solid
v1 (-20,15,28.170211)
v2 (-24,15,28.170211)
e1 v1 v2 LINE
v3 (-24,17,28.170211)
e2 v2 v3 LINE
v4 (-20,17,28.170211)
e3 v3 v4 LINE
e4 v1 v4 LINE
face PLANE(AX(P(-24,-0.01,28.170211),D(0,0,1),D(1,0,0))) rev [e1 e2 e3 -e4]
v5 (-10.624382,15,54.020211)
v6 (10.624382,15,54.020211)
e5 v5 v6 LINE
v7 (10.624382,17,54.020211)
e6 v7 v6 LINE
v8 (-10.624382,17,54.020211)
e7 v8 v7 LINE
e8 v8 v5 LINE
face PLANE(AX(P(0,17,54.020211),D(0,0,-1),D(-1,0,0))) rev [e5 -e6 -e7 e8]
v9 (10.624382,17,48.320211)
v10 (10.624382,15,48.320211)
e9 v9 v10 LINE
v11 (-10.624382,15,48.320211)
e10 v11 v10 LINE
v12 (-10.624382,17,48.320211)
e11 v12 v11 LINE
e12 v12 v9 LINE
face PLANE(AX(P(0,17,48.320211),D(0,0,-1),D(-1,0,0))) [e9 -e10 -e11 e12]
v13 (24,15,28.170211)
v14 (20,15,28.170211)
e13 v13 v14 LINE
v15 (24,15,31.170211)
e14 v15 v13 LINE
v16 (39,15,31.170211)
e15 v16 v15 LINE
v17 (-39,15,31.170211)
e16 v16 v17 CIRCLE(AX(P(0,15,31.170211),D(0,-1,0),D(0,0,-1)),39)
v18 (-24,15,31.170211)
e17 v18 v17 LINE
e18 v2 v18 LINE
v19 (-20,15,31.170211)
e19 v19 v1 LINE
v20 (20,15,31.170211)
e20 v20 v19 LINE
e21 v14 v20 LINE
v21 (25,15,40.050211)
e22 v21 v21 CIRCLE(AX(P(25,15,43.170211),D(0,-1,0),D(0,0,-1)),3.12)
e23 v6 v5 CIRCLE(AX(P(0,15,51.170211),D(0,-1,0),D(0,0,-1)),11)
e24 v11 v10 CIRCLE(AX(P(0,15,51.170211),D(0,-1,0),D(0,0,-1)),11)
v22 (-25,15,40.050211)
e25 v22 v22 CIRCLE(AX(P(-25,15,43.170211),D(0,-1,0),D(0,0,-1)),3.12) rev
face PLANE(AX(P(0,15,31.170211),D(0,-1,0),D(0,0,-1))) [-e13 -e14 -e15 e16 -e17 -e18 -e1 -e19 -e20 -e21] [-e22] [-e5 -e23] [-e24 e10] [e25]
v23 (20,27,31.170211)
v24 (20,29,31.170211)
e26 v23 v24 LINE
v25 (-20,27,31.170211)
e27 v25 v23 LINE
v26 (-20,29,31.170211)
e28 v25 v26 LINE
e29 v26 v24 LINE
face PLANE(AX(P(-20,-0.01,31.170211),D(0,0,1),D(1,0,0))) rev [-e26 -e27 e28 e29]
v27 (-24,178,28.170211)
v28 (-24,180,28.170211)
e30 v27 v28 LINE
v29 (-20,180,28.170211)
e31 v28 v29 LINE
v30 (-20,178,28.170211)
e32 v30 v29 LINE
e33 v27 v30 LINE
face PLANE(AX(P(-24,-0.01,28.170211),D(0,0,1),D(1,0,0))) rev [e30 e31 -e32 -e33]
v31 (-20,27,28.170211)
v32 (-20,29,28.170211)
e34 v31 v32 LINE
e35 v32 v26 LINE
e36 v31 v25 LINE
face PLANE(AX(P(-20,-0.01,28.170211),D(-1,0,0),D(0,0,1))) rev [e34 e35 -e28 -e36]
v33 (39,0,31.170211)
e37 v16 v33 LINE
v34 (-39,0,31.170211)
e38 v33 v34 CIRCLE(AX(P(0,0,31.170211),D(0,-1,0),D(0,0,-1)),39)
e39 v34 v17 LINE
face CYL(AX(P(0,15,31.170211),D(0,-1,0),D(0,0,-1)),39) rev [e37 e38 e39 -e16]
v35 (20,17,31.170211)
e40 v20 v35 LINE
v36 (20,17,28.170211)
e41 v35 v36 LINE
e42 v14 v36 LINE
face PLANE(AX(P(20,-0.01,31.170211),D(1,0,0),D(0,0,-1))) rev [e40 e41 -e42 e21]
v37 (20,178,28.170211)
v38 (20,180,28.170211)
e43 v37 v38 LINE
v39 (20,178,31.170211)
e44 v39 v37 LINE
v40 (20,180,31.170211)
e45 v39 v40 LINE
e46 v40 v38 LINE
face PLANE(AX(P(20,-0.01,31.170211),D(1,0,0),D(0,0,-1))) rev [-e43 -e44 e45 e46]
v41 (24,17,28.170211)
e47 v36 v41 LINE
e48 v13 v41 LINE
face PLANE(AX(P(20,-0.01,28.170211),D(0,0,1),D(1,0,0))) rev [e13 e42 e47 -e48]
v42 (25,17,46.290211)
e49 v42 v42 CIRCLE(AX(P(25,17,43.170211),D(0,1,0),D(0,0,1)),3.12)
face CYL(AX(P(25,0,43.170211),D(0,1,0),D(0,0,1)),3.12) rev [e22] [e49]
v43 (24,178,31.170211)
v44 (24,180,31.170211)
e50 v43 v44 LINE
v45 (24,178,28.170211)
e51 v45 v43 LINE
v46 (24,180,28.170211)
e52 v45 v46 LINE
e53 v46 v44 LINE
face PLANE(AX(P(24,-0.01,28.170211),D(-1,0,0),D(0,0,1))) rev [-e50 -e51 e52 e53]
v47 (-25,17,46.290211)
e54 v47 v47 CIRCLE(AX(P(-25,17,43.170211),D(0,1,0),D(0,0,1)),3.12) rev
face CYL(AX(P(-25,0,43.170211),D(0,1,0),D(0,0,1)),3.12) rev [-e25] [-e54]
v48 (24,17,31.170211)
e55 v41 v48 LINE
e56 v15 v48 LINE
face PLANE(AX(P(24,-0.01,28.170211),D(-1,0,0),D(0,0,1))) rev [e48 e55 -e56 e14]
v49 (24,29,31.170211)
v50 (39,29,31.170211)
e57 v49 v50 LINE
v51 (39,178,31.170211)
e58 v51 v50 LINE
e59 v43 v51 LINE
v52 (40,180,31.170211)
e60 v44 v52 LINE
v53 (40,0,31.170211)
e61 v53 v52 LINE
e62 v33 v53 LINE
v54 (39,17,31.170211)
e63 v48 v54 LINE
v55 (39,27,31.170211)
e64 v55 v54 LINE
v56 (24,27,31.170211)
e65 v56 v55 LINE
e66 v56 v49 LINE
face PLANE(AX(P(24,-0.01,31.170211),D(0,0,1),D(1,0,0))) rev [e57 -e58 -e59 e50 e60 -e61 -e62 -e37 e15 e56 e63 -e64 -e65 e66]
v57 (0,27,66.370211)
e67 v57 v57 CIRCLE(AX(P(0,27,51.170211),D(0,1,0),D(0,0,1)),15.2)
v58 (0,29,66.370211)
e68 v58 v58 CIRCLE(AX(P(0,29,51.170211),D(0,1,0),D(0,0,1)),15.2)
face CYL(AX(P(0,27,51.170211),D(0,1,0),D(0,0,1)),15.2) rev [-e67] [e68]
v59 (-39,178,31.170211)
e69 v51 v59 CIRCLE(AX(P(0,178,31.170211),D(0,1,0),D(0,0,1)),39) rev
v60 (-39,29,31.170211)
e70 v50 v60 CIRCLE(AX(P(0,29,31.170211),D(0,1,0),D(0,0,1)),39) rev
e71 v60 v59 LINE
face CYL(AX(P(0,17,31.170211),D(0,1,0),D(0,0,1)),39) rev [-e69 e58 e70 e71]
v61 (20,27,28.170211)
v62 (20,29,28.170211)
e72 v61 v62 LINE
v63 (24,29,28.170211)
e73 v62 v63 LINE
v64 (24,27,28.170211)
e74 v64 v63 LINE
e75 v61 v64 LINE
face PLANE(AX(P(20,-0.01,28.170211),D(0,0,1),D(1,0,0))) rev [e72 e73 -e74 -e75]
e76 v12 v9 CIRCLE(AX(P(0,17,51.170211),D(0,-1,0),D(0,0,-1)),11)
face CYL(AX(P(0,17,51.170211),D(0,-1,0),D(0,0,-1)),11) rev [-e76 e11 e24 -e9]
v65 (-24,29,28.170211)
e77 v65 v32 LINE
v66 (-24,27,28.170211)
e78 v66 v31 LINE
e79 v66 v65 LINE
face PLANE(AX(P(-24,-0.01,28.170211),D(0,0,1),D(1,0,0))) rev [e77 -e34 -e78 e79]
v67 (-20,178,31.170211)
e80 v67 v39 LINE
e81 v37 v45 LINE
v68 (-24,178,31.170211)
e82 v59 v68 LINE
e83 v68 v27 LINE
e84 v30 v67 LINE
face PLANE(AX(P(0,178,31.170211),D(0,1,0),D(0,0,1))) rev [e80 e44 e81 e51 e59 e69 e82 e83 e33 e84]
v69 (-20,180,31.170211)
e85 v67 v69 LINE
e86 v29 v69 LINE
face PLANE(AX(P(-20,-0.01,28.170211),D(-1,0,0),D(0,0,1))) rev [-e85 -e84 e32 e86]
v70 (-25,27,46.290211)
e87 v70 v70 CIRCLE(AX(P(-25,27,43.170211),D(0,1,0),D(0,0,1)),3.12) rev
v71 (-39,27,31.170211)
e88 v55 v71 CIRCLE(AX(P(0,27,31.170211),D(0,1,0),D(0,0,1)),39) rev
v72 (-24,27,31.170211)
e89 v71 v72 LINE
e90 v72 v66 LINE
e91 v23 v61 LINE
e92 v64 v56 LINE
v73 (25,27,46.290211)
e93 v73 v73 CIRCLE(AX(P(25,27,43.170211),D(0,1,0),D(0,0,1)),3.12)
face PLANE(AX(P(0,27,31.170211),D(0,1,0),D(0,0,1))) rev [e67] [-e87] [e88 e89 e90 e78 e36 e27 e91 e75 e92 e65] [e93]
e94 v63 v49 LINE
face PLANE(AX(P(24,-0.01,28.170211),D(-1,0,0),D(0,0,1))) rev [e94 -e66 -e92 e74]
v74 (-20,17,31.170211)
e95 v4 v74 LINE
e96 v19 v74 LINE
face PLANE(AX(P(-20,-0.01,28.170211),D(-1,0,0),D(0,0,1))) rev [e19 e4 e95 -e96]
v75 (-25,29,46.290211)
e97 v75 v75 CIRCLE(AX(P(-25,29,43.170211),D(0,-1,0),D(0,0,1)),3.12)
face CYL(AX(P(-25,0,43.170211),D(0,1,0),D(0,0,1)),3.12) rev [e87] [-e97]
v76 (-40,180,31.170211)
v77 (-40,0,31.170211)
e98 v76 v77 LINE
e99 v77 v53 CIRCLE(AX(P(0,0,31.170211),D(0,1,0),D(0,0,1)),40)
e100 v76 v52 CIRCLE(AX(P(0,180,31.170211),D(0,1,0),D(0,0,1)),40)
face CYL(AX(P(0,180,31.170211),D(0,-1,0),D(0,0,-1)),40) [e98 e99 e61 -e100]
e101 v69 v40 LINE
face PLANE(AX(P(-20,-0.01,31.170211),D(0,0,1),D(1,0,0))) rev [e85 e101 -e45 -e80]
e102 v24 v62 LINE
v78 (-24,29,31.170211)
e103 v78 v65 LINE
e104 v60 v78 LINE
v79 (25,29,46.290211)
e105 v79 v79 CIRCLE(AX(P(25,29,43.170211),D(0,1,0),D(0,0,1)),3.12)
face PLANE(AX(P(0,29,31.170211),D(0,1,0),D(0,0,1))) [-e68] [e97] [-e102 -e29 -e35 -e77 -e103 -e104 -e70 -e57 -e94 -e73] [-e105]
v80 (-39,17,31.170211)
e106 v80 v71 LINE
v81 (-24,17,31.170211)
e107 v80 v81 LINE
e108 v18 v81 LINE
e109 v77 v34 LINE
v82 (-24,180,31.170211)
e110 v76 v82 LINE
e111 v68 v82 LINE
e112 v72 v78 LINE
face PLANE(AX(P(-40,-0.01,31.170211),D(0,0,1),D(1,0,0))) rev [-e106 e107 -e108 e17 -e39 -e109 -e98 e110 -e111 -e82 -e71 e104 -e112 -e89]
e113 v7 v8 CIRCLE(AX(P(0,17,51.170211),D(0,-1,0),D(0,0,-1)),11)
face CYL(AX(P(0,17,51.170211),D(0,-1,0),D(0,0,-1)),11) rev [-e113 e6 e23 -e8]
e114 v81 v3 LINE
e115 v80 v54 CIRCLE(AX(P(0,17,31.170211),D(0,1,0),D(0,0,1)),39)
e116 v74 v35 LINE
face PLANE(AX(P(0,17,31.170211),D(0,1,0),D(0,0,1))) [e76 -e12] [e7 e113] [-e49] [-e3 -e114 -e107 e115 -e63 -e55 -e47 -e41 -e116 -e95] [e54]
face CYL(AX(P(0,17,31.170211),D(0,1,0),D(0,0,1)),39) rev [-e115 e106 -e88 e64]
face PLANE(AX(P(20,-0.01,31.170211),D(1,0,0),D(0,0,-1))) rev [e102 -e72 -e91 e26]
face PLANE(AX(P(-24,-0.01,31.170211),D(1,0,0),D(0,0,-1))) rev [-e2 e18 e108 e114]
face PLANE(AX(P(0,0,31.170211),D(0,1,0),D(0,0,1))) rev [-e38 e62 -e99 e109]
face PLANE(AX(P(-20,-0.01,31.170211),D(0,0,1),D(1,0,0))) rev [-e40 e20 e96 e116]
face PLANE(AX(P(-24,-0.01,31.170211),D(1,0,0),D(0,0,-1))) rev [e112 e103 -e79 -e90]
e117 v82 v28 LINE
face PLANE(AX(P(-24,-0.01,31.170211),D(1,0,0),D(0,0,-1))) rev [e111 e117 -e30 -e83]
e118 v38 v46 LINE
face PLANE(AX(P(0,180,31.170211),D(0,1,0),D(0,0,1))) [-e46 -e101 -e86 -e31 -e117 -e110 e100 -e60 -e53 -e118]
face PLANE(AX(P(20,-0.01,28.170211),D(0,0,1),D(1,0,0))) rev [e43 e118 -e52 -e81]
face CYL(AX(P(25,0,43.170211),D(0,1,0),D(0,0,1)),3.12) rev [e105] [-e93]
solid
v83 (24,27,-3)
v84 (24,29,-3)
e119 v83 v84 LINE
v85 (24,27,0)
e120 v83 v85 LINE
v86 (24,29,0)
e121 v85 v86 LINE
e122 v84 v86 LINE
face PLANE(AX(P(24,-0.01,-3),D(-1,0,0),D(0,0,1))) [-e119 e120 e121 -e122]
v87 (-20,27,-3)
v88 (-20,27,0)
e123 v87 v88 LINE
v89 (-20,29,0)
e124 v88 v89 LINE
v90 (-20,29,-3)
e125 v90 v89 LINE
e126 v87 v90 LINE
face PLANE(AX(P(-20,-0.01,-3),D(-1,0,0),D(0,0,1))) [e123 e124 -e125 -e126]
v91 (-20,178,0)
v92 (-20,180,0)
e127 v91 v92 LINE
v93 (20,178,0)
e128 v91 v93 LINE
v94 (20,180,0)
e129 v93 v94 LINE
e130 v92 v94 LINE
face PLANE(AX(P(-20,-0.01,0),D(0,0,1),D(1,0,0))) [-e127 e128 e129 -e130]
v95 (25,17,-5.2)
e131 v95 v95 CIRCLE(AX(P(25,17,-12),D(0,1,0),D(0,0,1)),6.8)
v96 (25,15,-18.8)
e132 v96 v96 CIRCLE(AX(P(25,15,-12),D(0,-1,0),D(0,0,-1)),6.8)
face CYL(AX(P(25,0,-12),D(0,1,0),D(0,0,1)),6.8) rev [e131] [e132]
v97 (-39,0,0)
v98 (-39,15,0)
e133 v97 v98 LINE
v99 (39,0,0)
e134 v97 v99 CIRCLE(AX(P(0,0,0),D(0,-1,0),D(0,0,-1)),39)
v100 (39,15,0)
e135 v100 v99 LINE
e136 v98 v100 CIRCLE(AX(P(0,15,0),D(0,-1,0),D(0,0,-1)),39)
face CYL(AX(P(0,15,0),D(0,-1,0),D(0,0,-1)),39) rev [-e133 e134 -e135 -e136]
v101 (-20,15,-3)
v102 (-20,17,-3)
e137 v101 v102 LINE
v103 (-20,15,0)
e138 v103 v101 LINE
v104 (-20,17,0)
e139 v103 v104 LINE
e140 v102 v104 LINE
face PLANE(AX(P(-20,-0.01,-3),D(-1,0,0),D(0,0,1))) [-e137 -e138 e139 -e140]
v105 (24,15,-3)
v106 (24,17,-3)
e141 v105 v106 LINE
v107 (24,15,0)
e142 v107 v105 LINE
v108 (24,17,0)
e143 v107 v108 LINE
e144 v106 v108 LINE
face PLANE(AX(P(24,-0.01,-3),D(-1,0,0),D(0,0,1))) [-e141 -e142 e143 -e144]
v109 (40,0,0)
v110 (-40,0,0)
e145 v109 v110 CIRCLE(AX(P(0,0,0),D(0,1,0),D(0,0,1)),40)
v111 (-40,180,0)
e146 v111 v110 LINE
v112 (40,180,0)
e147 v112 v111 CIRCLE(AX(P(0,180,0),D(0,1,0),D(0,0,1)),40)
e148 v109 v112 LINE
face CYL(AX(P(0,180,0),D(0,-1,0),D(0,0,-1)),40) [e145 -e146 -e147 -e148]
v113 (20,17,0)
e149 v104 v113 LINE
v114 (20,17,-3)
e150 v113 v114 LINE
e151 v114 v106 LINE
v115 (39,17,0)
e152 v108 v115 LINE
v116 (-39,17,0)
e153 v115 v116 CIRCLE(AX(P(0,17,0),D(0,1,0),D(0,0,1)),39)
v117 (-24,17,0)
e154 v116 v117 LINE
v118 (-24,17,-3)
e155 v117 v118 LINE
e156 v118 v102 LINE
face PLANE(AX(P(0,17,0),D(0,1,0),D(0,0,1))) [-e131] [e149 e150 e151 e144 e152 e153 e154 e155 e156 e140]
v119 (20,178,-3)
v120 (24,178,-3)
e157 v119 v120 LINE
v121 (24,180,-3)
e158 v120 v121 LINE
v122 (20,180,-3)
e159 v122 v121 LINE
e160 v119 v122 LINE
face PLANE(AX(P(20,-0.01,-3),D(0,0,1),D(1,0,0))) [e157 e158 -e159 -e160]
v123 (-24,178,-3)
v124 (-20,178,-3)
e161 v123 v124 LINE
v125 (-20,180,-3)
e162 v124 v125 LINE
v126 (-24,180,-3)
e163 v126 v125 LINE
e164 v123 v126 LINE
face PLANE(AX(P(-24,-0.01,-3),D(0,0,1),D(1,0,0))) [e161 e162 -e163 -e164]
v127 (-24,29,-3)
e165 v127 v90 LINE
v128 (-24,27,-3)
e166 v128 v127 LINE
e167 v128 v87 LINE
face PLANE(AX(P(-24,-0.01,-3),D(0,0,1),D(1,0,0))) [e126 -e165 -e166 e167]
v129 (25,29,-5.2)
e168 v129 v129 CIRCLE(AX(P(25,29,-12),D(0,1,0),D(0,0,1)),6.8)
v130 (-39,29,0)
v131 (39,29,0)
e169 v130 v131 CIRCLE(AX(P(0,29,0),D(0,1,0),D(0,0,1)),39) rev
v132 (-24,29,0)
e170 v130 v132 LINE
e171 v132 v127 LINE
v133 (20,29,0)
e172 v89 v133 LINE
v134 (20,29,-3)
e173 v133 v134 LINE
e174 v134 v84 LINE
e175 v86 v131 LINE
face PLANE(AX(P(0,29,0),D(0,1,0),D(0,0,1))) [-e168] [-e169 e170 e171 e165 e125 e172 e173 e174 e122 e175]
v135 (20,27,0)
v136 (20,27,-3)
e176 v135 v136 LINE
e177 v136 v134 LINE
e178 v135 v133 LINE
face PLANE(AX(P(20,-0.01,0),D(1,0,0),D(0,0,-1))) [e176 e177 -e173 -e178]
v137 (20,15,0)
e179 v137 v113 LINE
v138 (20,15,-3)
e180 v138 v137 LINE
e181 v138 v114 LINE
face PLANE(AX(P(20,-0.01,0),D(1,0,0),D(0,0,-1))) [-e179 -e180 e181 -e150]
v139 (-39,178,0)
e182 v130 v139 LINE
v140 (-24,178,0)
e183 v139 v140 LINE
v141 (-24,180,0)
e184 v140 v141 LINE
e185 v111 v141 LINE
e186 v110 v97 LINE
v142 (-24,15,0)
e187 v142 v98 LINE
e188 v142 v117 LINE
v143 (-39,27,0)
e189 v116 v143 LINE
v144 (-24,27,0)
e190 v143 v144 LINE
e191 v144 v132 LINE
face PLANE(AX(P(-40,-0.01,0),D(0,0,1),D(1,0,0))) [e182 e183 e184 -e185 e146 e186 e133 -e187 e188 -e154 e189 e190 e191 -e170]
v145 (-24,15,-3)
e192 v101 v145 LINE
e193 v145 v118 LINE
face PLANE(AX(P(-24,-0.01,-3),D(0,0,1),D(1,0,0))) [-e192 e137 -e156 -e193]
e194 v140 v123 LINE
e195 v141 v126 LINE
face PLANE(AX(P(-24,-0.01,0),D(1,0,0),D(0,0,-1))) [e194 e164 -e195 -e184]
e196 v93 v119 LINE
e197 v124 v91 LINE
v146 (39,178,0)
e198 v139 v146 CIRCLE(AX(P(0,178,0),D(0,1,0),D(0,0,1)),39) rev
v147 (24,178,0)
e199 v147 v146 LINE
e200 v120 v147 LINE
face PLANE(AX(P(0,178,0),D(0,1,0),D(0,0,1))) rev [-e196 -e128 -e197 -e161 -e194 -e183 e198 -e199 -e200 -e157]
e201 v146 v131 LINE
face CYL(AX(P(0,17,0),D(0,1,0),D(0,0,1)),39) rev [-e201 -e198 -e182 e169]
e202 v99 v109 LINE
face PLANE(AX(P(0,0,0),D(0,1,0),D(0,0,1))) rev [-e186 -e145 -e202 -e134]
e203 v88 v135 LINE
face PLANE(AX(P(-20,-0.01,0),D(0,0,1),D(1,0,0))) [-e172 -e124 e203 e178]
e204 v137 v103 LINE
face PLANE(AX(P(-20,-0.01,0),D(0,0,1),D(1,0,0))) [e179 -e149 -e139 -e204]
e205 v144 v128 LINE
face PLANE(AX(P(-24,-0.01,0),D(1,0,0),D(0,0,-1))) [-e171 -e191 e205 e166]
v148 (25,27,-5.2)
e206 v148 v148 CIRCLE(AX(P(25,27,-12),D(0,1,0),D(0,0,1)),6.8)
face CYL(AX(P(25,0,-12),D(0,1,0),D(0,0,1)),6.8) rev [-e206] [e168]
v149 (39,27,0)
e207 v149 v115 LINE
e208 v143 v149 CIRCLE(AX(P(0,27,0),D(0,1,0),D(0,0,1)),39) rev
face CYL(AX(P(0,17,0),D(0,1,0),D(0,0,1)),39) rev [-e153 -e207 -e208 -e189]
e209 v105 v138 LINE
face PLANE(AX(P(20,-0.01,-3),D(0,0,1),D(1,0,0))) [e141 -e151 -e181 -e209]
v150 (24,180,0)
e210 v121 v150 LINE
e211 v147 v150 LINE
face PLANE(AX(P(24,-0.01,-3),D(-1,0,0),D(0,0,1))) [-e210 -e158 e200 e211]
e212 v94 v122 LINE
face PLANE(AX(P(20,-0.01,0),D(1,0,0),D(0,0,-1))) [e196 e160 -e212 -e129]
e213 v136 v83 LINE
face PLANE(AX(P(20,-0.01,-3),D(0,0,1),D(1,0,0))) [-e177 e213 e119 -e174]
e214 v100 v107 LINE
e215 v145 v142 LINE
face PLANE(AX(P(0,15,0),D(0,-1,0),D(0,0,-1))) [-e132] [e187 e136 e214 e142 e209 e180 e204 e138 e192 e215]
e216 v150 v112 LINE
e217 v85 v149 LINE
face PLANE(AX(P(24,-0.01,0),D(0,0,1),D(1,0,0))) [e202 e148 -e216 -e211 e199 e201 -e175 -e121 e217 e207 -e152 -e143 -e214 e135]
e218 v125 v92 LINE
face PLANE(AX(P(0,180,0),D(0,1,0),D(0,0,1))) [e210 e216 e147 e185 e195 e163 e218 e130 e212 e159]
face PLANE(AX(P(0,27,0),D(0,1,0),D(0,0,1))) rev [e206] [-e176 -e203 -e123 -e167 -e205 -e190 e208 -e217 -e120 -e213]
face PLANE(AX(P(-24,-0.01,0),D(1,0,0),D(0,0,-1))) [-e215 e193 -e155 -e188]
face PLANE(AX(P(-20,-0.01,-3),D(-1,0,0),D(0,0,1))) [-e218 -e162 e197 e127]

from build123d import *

# Parameters (mm, degrees)
SKETCH1_R               = 40
BOSS_EXTRUDE1_DEPTH     = 180
SKETCH3_R               = 39
CUT_EXTRUDE1_DEPTH      = 163
CUT_EXTRUDE2_START      = -15
SKETCH5_R               = 39
CUT_EXTRUDE2_DEPTH      = 15
SKETCH6_R               = 40
BOSS_EXTRUDE2_DEPTH     = 2
BOSS_EXTRUDE3_START     = -2
SKETCH7_R               = 40
BOSS_EXTRUDE3_DEPTH     = 2
SPLIT1_SURFACE_1_BACK   = 213.603
SPLIT1_SURFACE_1_DEPTH  = 427.206
SPLIT1_SURFACE_2_BACK   = 213.603
SPLIT1_SURFACE_2_DEPTH  = 427.206
BODY_MOVE_COPY1_DEPTH   = 180
BODY_MOVE_COPY1_START   = 29
BODY_MOVE_COPY1_2_DEPTH = 149
BODY_MOVE_COPY1_3_DEPTH = 15
BODY_MOVE_COPY1_START_2 = 17
BODY_MOVE_COPY1_4_DEPTH = 10
BODY_MOVE_COPY1_5_DEPTH = 180
BODY_MOVE_COPY1_START_3 = 15
BODY_MOVE_COPY1_6_DEPTH = 2
BODY_MOVE_COPY1_START_4 = 27
BODY_MOVE_COPY1_7_DEPTH = 2
BODY_MOVE_COPY1_START_5 = 178
BODY_MOVE_COPY1_8_DEPTH = 2
SKETCH9_R               = 15.2
CUT_EXTRUDE3_DEPTH      = 2
CUT_EXTRUDE4_DEPTH      = 2
SKETCH11_R              = 3.12
CUT_EXTRUDE5_DEPTH      = 172.657213337
SKETCH14_R              = 6.8
CUT_EXTRUDE6_DEPTH      = 172.657213337


# Read off the part's stored shape, not the designer's step: Body-Move/Copy1
with BuildPart() as part:
    # Sketch1 → Boss-Extrude1 (new body)
    with BuildSketch(Plane(origin=(0, 0, 0), x_dir=(1, 0, 0), z_dir=(0, 1, 0))):
        with Locations(Location((0, 0, 0), (0, 0, 90))):
            Circle(SKETCH1_R)
    extrude(amount=BOSS_EXTRUDE1_DEPTH)

    # Sketch3 → Cut-Extrude1 (cut)
    with BuildSketch(Plane(origin=(0, 180, 0), x_dir=(1, 0, 0), z_dir=(0, 1, 0))):
        with Locations(Location((0, 0, 0), (0, 0, 270))):
            Circle(SKETCH3_R)
    extrude(amount=-CUT_EXTRUDE1_DEPTH, mode=Mode.SUBTRACT)

    # Sketch5 → Cut-Extrude2 (cut)
    with BuildSketch(Plane.XZ.offset(CUT_EXTRUDE2_START)):
        with Locations(Location((0, 0, 0), (0, 0, 90))):
            Circle(SKETCH5_R)
    extrude(amount=CUT_EXTRUDE2_DEPTH, mode=Mode.SUBTRACT)

    # Sketch6 → Boss-Extrude2 (add)
    with BuildSketch(Plane(origin=(0, 27, 0), x_dir=(1, 0, 0), z_dir=(0, 1, 0))):
        with Locations(Location((0, 0, 0), (0, 0, 90))):
            Circle(SKETCH6_R)
    extrude(amount=BOSS_EXTRUDE2_DEPTH)

    # Sketch7 → Boss-Extrude3 (add)
    with BuildSketch(Plane(origin=(0, 180, 0), x_dir=(1, 0, 0), z_dir=(0, 1, 0)).offset(BOSS_EXTRUDE3_START)):
        with Locations(Location((0, 0, 0), (0, 0, 90))):
            Circle(SKETCH7_R)
    extrude(amount=BOSS_EXTRUDE3_DEPTH)


with BuildPart() as body_2:
    # Split1: the piece behind the surface
    add(part.part)
    # Split1 surface: a surface, the sketch's curves swept straight by 427.206 mm
    with BuildLine(Plane(origin=(0, 180, 0), x_dir=(1, 0, 0), z_dir=(0, 1, 0)).offset(-SPLIT1_SURFACE_1_BACK), mode=Mode.PRIVATE) as split1_surface_1_path:
        Line((-40, 0), (-24, 0))
        Line((-24, 0), (-24, 3))
        Line((-24, 3), (-20, 3))
        Line((-20, 3), (-20, 0))
        Line((-20, 0), (20, 0))
        Line((20, 0), (20, 3))
        Line((20, 3), (24, 3))
        Line((24, 3), (24, 0))
        Line((24, 0), (40, 0))
    split1_surface_1 = Shell.extrude(split1_surface_1_path.wire(), (0 * SPLIT1_SURFACE_1_DEPTH, 1 * SPLIT1_SURFACE_1_DEPTH, 0 * SPLIT1_SURFACE_1_DEPTH))
    split(bisect_by=split1_surface_1, keep=Keep.BOTTOM)

    # Body-Move/Copy1 outline → Body-Move/Copy1 (cut)
    with BuildSketch(Plane(origin=(0, 0, 0), x_dir=(1, 0, 0), z_dir=(0, 1, 0))):
        with BuildLine():
            Line((20, -28.170210697), (24, -28.170210697))
            Line((24, -28.170210697), (24, -31.170210697))
            Line((24, -31.170210697), (25.068266097, -31.170210697))
            ThreePointArc((25.068266097, -31.170210697), (36.074441395, -17.281049681), (40, 0))
            Line((40, 0), (24, 0))
            Line((24, 0), (24, 3))
            Line((24, 3), (20, 3))
            Line((20, 3), (20, 0))
            Line((20, 0), (-20, 0))
            Line((-20, 0), (-20, 3))
            Line((-20, 3), (-24, 3))
            Line((-24, 3), (-24, 0))
            Line((-24, 0), (-40, 0))
            ThreePointArc((-40, 0), (-36.074441395, -17.281049681), (-25.068266097, -31.170210697))
            Line((-25.068266097, -31.170210697), (-24, -31.170210697))
            Line((-24, -31.170210697), (-24, -28.170210697))
            Line((-24, -28.170210697), (-20, -28.170210697))
            Line((-20, -28.170210697), (-20, -31.170210697))
            Line((-20, -31.170210697), (20, -31.170210697))
            Line((20, -31.170210697), (20, -28.170210697))
        make_face()
    extrude(amount=BODY_MOVE_COPY1_DEPTH, mode=Mode.SUBTRACT)

    # Body-Move_Copy1 2 outline → Body-Move_Copy1 2 (cut)
    with BuildSketch(Plane(origin=(0, 0, 0), x_dir=(1, 0, 0), z_dir=(0, 1, 0)).offset(BODY_MOVE_COPY1_START)):
        with BuildLine():
            Line((24, -31.170210697), (24, -30.740852298))
            ThreePointArc((24, -30.740852298), (0, -39), (-24, -30.740852298))
            Line((-24, -30.740852298), (-24, -31.170210697))
            Line((-24, -31.170210697), (-25.068266097, -31.170210697))
            ThreePointArc((-25.068266097, -31.170210697), (0, -40), (25.068266097, -31.170210697))
            Line((25.068266097, -31.170210697), (24, -31.170210697))
        make_face()
    extrude(amount=BODY_MOVE_COPY1_2_DEPTH, mode=Mode.SUBTRACT)

    # Body-Move_Copy1 3 outline → Body-Move_Copy1 3 (cut)
    with BuildSketch(Plane(origin=(0, 0, 0), x_dir=(1, 0, 0), z_dir=(0, 1, 0))):
        with BuildLine():
            Line((24, -31.170210697), (24, -30.740852298))
            ThreePointArc((24, -30.740852298), (0, -39), (-24, -30.740852298))
            Line((-24, -30.740852298), (-24, -31.170210697))
            Line((-24, -31.170210697), (-25.068266097, -31.170210697))
            ThreePointArc((-25.068266097, -31.170210697), (0, -40), (25.068266097, -31.170210697))
            Line((25.068266097, -31.170210697), (24, -31.170210697))
        make_face()
    extrude(amount=BODY_MOVE_COPY1_3_DEPTH, mode=Mode.SUBTRACT)

    # Body-Move_Copy1 4 outline → Body-Move_Copy1 4 (cut)
    with BuildSketch(Plane(origin=(0, 0, 0), x_dir=(1, 0, 0), z_dir=(0, 1, 0)).offset(BODY_MOVE_COPY1_START_2)):
        with BuildLine():
            Line((24, -31.170210697), (24, -30.740852298))
            ThreePointArc((24, -30.740852298), (0, -39), (-24, -30.740852298))
            Line((-24, -30.740852298), (-24, -31.170210697))
            Line((-24, -31.170210697), (-25.068266097, -31.170210697))
            ThreePointArc((-25.068266097, -31.170210697), (0, -40), (25.068266097, -31.170210697))
            Line((25.068266097, -31.170210697), (24, -31.170210697))
        make_face()
    extrude(amount=BODY_MOVE_COPY1_4_DEPTH, mode=Mode.SUBTRACT)



with BuildPart() as part_1:
    add(part.part)

    # Split1: split by a surface, the side it looks to stays
    # Split1 surface: a surface, the sketch's curves swept straight by 427.206 mm
    with BuildLine(Plane(origin=(0, 180, 0), x_dir=(1, 0, 0), z_dir=(0, 1, 0)).offset(-SPLIT1_SURFACE_2_BACK), mode=Mode.PRIVATE) as split1_surface_2_path:
        Line((-40, 0), (-24, 0))
        Line((-24, 0), (-24, 3))
        Line((-24, 3), (-20, 3))
        Line((-20, 3), (-20, 0))
        Line((-20, 0), (20, 0))
        Line((20, 0), (20, 3))
        Line((20, 3), (24, 3))
        Line((24, 3), (24, 0))
        Line((24, 0), (40, 0))
    split1_surface_2 = Shell.extrude(split1_surface_2_path.wire(), (0 * SPLIT1_SURFACE_2_DEPTH, 1 * SPLIT1_SURFACE_2_DEPTH, 0 * SPLIT1_SURFACE_2_DEPTH))
    split(bisect_by=split1_surface_2, keep=Keep.TOP)

    # Sketch14 → Cut-Extrude6 (cut, through all)
    with BuildSketch(Plane(origin=(0, 29, 0), x_dir=(1, 0, 0), z_dir=(0, 1, 0))):
        with Locations(Location((25, 12, 0), (0, 0, 270))):
            Circle(SKETCH14_R)
    extrude(amount=-CUT_EXTRUDE6_DEPTH, mode=Mode.SUBTRACT)


with BuildPart() as body_3:
    # Body-Move_Copy1 5 outline → Body-Move_Copy1 5 (new body)
    with BuildSketch(Plane(origin=(0, 0, 0), x_dir=(1, 0, 0), z_dir=(0, 1, 0))):
        with BuildLine():
            Line((40, -31.170210697), (39, -31.170210697))
            ThreePointArc((39, -31.170210697), (0, -70.170210697), (-39, -31.170210697))
            Line((-39, -31.170210697), (-40, -31.170210697))
            ThreePointArc((-40, -31.170210697), (0, -71.170210697), (40, -31.170210697))
        make_face()
    extrude(amount=BODY_MOVE_COPY1_5_DEPTH)


with BuildPart() as body_2_1:
    add(body_2.part)

    add(body_3.part)  # Body-Move_Copy1 6 merges body 3
    # Body-Move_Copy1 6 outline → Body-Move_Copy1 6 (add)
    with BuildSketch(Plane(origin=(0, 0, 0), x_dir=(1, 0, 0), z_dir=(0, 1, 0)).offset(BODY_MOVE_COPY1_START_3)):
        with BuildLine():
            Line((39, -31.170210697), (25.068266097, -31.170210697))
            ThreePointArc((25.068266097, -31.170210697), (0, -40), (-25.068266097, -31.170210697))
            Line((-25.068266097, -31.170210697), (-39, -31.170210697))
            ThreePointArc((-39, -31.170210697), (0, -70.170210697), (39, -31.170210697))
        make_face()
    extrude(amount=BODY_MOVE_COPY1_6_DEPTH)

    # Body-Move_Copy1 7 outline → Body-Move_Copy1 7 (add)
    with BuildSketch(Plane(origin=(0, 0, 0), x_dir=(1, 0, 0), z_dir=(0, 1, 0)).offset(BODY_MOVE_COPY1_START_4)):
        with BuildLine():
            Line((39, -31.170210697), (25.068266097, -31.170210697))
            ThreePointArc((25.068266097, -31.170210697), (0, -40), (-25.068266097, -31.170210697))
            Line((-25.068266097, -31.170210697), (-39, -31.170210697))
            ThreePointArc((-39, -31.170210697), (0, -70.170210697), (39, -31.170210697))
        make_face()
    extrude(amount=BODY_MOVE_COPY1_7_DEPTH)

    # Body-Move_Copy1 8 outline → Body-Move_Copy1 8 (add)
    with BuildSketch(Plane(origin=(0, 0, 0), x_dir=(1, 0, 0), z_dir=(0, 1, 0)).offset(BODY_MOVE_COPY1_START_5)):
        with BuildLine():
            Line((39, -31.170210697), (25.068266097, -31.170210697))
            ThreePointArc((25.068266097, -31.170210697), (0, -40), (-25.068266097, -31.170210697))
            Line((-25.068266097, -31.170210697), (-39, -31.170210697))
            ThreePointArc((-39, -31.170210697), (0, -70.170210697), (39, -31.170210697))
        make_face()
    extrude(amount=BODY_MOVE_COPY1_8_DEPTH)

    # Sketch9 → Cut-Extrude3 (cut)
    with BuildSketch(Plane(origin=(0, 29, 0), x_dir=(1, 0, 0), z_dir=(0, 1, 0))):
        with Locations(Location((0, -51.170210697, 0), (0, 0, 270))):
            Circle(SKETCH9_R)
    extrude(amount=-CUT_EXTRUDE3_DEPTH, mode=Mode.SUBTRACT)

    # Sketch10 → Cut-Extrude4 (cut)
    with BuildSketch(Plane.XZ.offset(-15)):
        with BuildLine():
            Line((-10.624382335, 54.020210697), (0, 54.020210697))
            Line((0, 54.020210697), (0, 62.170210697))
            ThreePointArc((0, 62.170210697), (-6.695147497, 59.898039752), (-10.624382335, 54.020210697))
        make_face()
        with BuildLine():
            Line((0, 62.170210697), (0, 54.020210697))
            Line((0, 54.020210697), (10.624382335, 54.020210697))
            ThreePointArc((10.624382335, 54.020210697), (6.695147497, 59.898039752), (0, 62.170210697))
        make_face()
        with BuildLine():
            ThreePointArc((-10.624382335, 48.320210697), (-6.695147497, 42.442381643), (0, 40.170210697))
            Line((0, 40.170210697), (0, 48.320210697))
            Line((0, 48.320210697), (-10.624382335, 48.320210697))
        make_face()
        with BuildLine():
            Line((0, 48.320210697), (0, 40.170210697))
            ThreePointArc((0, 40.170210697), (6.695147497, 42.442381643), (10.624382335, 48.320210697))
            Line((10.624382335, 48.320210697), (0, 48.320210697))
        make_face()
    extrude(amount=-CUT_EXTRUDE4_DEPTH, mode=Mode.SUBTRACT)

    # Sketch11 → Cut-Extrude5 (cut, through all)
    with BuildSketch(Plane(origin=(0, 29, 0), x_dir=(1, 0, 0), z_dir=(0, 1, 0))):
        with Locations(Location((25, -43.170210697, 0), (0, 0, 270))):
            Circle(SKETCH11_R)
    cut_extrude5 = extrude(amount=-CUT_EXTRUDE5_DEPTH, mode=Mode.SUBTRACT)

    # Mirror1: Cut-Extrude5 across plane
    add(cut_extrude5.mirror(Plane(origin=(0, 0, 0), x_dir=(0, 0, 1), z_dir=(1, 0, 0))), mode=Mode.SUBTRACT)


solid = Compound([part_1.part, body_2_1.part])
